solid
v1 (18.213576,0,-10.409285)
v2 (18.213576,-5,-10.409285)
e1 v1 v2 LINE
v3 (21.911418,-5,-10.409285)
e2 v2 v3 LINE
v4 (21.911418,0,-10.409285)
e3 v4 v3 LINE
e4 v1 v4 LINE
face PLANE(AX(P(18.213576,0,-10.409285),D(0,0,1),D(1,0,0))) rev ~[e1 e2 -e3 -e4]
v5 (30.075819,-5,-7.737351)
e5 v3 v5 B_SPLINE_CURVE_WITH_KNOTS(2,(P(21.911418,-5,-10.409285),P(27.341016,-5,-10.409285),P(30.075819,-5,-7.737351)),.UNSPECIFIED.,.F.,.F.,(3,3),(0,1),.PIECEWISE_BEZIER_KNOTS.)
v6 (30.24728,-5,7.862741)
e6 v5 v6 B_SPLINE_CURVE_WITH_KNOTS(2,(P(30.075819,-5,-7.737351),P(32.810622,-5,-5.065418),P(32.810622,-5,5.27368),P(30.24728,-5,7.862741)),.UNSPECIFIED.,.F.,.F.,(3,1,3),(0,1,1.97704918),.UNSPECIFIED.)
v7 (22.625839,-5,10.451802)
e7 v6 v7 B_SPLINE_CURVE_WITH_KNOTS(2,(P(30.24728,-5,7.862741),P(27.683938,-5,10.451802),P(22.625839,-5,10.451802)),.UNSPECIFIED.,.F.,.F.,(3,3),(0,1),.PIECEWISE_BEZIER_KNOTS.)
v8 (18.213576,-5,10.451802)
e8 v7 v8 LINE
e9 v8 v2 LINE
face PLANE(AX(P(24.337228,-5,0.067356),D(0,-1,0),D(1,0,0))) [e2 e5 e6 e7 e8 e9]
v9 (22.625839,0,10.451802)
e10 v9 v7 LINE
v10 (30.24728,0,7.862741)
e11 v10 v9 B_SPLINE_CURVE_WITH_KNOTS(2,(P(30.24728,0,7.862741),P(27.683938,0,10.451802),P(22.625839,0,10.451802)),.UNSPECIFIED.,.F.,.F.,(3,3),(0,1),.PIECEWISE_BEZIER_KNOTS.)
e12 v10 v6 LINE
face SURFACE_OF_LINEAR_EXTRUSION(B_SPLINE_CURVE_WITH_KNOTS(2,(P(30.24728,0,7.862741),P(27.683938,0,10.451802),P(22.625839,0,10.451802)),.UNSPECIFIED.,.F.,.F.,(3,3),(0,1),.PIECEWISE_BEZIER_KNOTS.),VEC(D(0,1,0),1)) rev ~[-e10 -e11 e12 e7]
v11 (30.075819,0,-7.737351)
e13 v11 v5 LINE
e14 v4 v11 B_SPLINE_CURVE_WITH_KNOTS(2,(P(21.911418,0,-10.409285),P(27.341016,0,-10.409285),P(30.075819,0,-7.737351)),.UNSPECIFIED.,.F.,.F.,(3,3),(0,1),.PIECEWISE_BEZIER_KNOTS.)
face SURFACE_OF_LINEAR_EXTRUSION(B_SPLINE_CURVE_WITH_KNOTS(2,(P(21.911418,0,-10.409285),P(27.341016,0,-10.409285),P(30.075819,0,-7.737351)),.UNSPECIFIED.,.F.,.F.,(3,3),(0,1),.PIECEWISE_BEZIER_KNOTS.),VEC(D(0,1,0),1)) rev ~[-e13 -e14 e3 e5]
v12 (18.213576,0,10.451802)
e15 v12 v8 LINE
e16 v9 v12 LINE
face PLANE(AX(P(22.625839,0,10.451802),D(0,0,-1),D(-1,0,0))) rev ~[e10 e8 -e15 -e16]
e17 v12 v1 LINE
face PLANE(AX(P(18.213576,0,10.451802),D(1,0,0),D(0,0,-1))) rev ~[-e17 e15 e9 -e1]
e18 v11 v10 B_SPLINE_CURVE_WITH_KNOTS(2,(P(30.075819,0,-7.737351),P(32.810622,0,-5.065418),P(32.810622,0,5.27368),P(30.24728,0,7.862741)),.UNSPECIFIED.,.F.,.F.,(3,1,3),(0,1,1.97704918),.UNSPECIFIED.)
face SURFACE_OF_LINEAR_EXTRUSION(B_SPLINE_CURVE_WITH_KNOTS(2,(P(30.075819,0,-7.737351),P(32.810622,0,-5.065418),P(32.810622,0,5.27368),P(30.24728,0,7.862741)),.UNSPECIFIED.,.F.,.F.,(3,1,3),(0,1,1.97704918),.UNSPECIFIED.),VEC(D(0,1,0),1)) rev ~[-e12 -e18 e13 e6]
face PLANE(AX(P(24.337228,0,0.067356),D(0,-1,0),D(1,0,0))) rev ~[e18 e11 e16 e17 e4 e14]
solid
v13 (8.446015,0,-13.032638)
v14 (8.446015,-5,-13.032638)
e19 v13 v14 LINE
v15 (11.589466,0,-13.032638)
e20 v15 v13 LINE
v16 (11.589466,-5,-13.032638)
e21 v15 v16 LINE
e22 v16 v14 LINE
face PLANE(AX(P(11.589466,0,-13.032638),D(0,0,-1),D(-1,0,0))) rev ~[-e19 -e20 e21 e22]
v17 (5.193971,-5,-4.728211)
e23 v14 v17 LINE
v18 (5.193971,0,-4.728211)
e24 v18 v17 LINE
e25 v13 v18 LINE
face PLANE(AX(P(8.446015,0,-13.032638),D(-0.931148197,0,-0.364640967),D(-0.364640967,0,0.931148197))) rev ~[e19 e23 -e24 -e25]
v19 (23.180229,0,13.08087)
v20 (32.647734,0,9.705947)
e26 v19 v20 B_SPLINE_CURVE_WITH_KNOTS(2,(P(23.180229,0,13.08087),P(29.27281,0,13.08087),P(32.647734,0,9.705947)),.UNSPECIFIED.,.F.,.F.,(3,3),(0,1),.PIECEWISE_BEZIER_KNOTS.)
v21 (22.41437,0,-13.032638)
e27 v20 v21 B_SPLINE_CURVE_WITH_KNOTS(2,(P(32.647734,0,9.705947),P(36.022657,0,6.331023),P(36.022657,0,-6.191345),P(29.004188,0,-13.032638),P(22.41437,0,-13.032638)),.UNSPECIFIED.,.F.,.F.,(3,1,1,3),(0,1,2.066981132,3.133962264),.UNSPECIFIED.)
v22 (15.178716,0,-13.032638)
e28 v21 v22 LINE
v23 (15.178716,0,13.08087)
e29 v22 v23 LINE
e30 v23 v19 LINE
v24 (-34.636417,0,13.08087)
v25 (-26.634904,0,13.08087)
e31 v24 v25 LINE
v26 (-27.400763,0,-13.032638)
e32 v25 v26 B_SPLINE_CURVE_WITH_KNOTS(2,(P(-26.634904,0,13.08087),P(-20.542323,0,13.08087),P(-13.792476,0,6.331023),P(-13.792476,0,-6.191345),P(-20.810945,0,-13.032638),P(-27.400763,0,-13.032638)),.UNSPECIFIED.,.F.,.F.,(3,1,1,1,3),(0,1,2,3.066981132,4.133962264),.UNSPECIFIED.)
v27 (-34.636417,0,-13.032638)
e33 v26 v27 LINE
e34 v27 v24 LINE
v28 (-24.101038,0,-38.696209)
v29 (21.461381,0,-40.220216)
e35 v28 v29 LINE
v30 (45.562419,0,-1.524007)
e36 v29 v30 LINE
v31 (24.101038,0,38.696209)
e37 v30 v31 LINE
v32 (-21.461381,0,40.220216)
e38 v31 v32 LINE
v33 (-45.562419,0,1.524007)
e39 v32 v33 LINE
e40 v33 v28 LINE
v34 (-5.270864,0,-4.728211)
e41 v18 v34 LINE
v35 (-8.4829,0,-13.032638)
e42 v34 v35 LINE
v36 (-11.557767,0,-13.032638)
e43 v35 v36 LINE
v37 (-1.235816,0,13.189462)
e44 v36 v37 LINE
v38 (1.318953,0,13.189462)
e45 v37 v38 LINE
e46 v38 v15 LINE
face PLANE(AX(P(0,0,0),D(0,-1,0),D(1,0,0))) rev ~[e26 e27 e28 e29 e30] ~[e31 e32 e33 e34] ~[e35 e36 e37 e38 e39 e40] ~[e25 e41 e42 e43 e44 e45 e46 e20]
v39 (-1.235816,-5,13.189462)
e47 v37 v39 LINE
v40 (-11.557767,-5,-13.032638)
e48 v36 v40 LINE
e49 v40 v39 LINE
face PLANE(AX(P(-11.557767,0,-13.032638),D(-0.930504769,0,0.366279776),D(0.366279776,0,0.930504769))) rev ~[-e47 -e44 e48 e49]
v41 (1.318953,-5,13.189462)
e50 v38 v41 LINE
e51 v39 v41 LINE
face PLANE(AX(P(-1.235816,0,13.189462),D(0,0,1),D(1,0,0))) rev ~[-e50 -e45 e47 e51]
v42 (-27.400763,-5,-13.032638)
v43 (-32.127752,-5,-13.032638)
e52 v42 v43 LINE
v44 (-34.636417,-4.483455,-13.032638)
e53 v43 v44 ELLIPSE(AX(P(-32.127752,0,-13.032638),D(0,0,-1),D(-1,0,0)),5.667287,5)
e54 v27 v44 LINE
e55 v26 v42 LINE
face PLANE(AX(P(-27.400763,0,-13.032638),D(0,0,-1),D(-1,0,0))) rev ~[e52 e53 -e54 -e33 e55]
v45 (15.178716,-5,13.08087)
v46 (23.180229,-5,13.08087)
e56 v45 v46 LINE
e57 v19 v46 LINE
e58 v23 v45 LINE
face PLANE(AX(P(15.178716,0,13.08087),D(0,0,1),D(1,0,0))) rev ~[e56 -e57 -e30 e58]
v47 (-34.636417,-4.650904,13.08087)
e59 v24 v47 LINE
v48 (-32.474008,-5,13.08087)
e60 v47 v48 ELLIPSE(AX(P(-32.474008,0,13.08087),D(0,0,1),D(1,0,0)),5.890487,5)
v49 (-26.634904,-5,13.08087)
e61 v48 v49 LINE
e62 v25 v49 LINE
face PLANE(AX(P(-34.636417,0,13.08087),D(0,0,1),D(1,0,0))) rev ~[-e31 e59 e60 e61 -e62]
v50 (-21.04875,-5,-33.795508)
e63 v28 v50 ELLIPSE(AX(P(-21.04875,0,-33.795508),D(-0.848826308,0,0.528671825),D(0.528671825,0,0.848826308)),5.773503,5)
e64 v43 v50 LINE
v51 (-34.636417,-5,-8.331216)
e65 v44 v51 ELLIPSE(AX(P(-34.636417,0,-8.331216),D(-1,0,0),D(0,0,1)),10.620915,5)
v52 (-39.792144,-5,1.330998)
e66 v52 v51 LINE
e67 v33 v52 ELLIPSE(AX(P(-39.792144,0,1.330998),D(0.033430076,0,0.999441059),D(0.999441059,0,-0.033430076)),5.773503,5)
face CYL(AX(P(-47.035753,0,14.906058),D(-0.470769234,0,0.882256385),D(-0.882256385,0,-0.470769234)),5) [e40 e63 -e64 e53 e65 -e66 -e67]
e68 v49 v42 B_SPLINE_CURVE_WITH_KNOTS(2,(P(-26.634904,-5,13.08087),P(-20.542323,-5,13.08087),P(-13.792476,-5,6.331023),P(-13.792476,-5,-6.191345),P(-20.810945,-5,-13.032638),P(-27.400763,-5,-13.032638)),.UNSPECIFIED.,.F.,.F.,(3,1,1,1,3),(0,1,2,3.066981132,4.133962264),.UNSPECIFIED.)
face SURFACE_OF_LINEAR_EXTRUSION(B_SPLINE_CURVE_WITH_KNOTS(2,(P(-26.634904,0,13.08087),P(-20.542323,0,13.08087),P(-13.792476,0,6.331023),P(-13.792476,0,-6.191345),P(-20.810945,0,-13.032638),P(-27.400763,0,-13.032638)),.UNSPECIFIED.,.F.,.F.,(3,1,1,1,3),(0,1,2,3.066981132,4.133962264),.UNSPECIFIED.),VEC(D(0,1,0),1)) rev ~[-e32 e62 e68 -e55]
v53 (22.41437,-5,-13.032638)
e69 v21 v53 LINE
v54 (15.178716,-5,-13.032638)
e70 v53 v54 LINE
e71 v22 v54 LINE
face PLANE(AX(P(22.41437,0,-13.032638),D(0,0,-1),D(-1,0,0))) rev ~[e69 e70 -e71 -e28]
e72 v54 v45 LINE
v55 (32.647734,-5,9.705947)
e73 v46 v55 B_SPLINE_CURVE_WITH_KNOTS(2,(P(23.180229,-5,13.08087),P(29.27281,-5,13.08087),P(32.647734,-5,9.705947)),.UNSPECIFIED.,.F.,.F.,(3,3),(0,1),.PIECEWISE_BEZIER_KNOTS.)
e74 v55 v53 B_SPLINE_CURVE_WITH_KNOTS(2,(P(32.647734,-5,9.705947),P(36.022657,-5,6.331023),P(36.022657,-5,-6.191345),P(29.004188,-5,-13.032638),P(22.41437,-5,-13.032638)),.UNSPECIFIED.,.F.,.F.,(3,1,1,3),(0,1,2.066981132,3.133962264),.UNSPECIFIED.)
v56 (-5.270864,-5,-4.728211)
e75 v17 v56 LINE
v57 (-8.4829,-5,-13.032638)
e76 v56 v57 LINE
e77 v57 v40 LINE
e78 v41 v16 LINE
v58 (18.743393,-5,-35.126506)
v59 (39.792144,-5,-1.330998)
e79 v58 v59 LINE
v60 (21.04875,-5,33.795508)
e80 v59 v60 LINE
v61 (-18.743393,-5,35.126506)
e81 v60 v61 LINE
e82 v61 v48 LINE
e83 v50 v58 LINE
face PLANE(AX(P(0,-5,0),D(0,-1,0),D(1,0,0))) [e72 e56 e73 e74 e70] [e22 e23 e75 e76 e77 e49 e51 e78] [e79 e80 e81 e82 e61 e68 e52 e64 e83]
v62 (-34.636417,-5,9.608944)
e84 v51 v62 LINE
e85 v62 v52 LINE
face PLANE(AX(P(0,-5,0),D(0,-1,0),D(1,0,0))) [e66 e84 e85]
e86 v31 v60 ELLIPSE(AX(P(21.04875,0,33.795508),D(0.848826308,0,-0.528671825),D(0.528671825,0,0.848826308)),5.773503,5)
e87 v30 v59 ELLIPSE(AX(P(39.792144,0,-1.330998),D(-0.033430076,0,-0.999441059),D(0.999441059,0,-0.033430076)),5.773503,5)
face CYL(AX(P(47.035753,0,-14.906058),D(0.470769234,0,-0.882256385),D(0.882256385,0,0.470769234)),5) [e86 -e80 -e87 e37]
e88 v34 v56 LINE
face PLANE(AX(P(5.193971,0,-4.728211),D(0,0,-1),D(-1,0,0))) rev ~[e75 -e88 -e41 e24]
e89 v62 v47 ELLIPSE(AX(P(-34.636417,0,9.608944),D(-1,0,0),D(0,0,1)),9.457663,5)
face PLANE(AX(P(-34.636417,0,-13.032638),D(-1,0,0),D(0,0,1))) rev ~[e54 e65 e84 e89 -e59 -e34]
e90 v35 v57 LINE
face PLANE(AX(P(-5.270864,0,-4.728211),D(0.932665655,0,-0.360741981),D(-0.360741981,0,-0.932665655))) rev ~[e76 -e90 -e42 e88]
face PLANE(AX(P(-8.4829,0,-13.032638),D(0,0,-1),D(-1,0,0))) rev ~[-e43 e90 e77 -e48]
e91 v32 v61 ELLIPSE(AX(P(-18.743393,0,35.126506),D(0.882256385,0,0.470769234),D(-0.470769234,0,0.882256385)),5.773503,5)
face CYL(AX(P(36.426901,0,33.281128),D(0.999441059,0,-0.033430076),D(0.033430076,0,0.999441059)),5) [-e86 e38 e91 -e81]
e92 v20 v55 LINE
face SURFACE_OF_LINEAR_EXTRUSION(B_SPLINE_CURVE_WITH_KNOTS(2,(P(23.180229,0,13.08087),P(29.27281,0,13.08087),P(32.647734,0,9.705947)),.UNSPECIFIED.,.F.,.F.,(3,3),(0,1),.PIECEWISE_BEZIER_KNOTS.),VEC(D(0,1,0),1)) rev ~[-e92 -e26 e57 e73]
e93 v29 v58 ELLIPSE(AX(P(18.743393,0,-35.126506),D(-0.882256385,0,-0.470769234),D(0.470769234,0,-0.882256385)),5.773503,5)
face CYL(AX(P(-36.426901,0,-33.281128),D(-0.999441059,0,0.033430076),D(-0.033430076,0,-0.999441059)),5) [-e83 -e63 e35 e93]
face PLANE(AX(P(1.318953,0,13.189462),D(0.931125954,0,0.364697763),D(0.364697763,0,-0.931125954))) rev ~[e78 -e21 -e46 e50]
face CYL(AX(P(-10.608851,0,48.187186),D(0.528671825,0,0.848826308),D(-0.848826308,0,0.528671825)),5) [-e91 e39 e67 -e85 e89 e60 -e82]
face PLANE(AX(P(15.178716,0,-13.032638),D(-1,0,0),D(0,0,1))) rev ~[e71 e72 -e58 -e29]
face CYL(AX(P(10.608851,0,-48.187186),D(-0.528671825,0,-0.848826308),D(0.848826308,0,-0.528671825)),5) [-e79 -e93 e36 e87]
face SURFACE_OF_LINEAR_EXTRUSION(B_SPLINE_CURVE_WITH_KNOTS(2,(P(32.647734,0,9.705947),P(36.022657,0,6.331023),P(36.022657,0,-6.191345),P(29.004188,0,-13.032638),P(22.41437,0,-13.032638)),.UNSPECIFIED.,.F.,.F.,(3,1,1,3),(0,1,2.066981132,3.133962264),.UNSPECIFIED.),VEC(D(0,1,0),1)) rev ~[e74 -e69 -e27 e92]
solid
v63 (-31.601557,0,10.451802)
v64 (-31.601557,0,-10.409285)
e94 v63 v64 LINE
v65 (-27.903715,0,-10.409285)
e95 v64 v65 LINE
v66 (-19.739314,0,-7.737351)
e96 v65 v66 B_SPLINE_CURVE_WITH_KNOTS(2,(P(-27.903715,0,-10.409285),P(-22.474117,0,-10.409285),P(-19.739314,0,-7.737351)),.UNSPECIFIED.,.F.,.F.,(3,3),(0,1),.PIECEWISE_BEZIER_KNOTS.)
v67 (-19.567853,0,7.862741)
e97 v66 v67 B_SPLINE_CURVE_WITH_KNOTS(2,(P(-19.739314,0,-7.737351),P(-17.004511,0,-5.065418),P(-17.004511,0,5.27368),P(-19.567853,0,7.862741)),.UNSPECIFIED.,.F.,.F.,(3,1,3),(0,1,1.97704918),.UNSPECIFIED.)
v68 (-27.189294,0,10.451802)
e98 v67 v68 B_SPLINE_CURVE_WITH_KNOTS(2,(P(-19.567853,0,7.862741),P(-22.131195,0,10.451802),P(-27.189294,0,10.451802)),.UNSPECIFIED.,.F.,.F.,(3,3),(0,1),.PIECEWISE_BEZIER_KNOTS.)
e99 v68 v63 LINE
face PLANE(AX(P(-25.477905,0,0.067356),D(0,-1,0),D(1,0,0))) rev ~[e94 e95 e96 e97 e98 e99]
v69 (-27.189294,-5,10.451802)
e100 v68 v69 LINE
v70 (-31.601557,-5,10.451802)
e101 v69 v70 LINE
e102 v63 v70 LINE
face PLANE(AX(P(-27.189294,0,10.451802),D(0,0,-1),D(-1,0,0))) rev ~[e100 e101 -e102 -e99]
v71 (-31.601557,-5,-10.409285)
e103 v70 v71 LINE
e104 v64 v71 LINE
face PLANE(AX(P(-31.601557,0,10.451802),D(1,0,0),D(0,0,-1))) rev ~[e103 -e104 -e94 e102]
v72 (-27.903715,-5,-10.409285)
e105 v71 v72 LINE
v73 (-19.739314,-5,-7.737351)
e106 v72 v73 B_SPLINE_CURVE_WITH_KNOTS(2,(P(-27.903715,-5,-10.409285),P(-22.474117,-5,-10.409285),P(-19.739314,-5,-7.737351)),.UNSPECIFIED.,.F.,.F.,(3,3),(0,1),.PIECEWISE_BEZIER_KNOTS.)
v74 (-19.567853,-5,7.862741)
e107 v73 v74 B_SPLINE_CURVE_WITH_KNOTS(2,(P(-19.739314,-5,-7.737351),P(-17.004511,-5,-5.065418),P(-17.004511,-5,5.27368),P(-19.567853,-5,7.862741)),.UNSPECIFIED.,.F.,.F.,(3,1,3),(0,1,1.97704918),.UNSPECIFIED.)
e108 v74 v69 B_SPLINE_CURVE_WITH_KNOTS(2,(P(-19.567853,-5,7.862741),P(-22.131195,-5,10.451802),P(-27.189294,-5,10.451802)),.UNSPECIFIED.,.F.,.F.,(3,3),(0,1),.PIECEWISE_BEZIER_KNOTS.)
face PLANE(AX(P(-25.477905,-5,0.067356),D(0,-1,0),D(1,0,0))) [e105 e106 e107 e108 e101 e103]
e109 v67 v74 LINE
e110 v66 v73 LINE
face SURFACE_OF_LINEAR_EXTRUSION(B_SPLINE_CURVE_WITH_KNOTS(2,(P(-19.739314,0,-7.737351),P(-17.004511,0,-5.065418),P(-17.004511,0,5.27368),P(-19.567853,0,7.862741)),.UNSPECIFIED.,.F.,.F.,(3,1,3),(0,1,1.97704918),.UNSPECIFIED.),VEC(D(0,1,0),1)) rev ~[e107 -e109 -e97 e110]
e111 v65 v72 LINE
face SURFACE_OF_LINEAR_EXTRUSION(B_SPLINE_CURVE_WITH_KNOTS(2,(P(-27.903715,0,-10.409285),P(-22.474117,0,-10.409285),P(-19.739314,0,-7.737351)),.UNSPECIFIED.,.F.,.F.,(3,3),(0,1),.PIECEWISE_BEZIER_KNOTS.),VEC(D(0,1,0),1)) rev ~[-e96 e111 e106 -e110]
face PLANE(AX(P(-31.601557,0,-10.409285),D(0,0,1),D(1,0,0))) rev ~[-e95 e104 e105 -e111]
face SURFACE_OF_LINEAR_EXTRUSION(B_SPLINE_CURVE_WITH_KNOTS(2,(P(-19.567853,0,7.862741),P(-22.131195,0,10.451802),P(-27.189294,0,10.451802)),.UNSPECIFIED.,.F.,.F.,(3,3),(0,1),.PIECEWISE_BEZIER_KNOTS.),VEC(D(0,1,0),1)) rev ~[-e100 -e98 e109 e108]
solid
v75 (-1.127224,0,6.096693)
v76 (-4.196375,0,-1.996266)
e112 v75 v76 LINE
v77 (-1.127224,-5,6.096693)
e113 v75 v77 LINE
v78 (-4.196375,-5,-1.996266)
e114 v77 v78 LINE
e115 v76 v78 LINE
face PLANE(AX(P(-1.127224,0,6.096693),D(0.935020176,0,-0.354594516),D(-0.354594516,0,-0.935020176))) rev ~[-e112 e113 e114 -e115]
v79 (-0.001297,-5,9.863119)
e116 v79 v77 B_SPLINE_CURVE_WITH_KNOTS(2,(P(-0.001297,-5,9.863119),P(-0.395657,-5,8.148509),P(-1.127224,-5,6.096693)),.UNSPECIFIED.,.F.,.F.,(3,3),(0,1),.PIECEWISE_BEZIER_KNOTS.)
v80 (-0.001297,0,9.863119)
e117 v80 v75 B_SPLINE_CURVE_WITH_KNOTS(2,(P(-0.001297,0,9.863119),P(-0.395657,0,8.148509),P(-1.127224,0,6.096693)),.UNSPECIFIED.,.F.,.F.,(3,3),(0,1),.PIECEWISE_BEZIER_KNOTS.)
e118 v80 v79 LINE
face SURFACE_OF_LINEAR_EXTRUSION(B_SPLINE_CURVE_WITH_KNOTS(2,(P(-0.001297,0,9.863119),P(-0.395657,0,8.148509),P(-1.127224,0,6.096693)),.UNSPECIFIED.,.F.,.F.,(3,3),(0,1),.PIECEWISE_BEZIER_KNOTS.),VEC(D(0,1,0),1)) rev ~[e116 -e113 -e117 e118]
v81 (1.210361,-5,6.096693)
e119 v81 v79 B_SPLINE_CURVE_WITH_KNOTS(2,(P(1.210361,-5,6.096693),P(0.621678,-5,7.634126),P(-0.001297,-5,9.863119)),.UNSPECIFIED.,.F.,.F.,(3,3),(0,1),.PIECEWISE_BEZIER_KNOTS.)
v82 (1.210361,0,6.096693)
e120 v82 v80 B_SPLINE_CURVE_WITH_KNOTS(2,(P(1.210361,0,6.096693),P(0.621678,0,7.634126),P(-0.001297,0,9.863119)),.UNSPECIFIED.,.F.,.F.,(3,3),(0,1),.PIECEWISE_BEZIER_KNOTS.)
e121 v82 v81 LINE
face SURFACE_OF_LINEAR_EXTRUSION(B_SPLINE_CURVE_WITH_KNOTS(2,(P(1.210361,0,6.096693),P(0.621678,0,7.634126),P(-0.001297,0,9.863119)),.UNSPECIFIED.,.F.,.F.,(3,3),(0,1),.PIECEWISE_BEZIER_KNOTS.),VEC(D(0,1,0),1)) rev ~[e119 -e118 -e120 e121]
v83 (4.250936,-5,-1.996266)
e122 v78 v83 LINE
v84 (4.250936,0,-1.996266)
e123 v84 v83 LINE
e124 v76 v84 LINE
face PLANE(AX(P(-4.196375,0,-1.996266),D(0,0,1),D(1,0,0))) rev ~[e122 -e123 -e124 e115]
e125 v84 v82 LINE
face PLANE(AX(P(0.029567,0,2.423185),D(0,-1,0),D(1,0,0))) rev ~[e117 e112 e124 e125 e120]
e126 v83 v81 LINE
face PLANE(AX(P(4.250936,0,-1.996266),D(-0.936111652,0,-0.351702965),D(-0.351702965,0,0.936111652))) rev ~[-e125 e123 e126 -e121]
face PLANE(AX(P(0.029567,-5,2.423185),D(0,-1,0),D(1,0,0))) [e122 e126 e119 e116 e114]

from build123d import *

# Parameters (mm, degrees)
F1_DEPTH     = 5
F2_T1_DEPTH  = 70.5879001638
F2_T3_DEPTH  = 70.5879001638
F2_T5_DEPTH  = 70.5879001638
F2_T7_DEPTH  = 70.5879001638
F2_T9_DEPTH  = 70.5879001638
F2_T11_DEPTH = 70.5879001638


# Not quite as in the source:
# - a fillet or chamfer that OpenCascade refuses, or shapes differently, is made with other operations: its cross-section is extruded or revolved along the edge and cut away or added


with BuildPart() as f1:
    # F0 (on Front) → F1 (new body)
    with BuildSketch(Plane.XZ):
        with BuildLine():
            Line((-4.1963754653, -1.9962660098), (4.2509359723, -1.9962660098))
            Line((4.2509359723, -1.9962660098), (1.2103610841, 6.0966927153))
            add(Edge.make_bspline(
                [(1.2103610841, 6.0966927153), (0.621678352, 7.6341262584), (-0.0012965781, 9.8631191276)],
                knots=[0, 0, 0, 1, 1, 1], degree=2))
            add(Edge.make_bspline(
                [(-0.0012965781, 9.8631191276), (-0.395656855, 8.1485092282), (-1.1272237454, 6.0966927153)],
                knots=[0, 0, 0, 1, 1, 1], degree=2))
            Line((-1.1272237454, 6.0966927153), (-4.1963754653, -1.9962660098))
        make_face()
    extrude(amount=F1_DEPTH)


with BuildPart() as f1b:
    # F0 (on Front) → F1, piece 2 (new body)
    with BuildSketch(Plane.XZ):
        with BuildLine():
            add(Edge.make_bspline(
                [(30.0758187402, -7.7373514895), (32.8106215297, -5.0654177297), (32.8106215297, 0.1641424634)],
                knots=[0, 0, 0, 1, 1, 1], degree=2))
            add(Edge.make_bspline(
                [(32.8106215297, 0.1641424634), (32.8106215297, 5.2736799636), (30.2472797301, 7.8627409117)],
                knots=[0, 0, 0, 1, 1, 1], degree=2))
            add(Edge.make_bspline(
                [(30.2472797301, 7.8627409117), (27.6839379305, 10.4518018597), (22.6258387274, 10.4518018597)],
                knots=[0, 0, 0, 1, 1, 1], degree=2))
            Line((22.6258387274, 10.4518018597), (18.2135759196, 10.4518018597))
            Line((18.2135759196, 10.4518018597), (18.2135759196, -10.4092852494))
            Line((18.2135759196, -10.4092852494), (21.911417936, -10.4092852494))
            add(Edge.make_bspline(
                [(21.911417936, -10.4092852494), (27.3410159507, -10.4092852494), (30.0758187402, -7.7373514895)],
                knots=[0, 0, 0, 1, 1, 1], degree=2))
        make_face()
    extrude(amount=F1_DEPTH)


with BuildPart() as f1c:
    # F0 (on Front) → F1, piece 3 (new body)
    with BuildSketch(Plane.XZ):
        Polygon((45.5624192078, -1.5240069806), (24.1010383647, 38.6962090015), (-21.4613808431, 40.2202159821), (-45.5624192078, 1.5240069806), (-24.1010383647, -38.6962090015), (21.4613808431, -40.2202159821), align=None)
        with BuildLine():
            add(Edge.make_bspline(
                [(-17.1673993541, 9.7059465535), (-13.7924755355, 6.3310227349), (-13.7924755355, 0.2727344237)],
                knots=[0, 0, 0, 1, 1, 1], degree=2))
            add(Edge.make_bspline(
                [(-13.7924755355, 0.2727344237), (-13.7924755355, -6.1913448969), (-17.3017104629, -9.6119916462)],
                knots=[0, 0, 0, 1, 1, 1], degree=2))
            add(Edge.make_bspline(
                [(-17.3017104629, -9.6119916462), (-20.8109453903, -13.0326383955), (-27.4007627703, -13.0326383955)],
                knots=[0, 0, 0, 1, 1, 1], degree=2))
            Line((-27.4007627703, -13.0326383955), (-34.6364165456, -13.0326383955))
            Line((-34.6364165456, -13.0326383955), (-34.6364165456, 13.0808703721))
            Line((-34.6364165456, 13.0808703721), (-26.6349036819, 13.0808703721))
            add(Edge.make_bspline(
                [(-26.6349036819, 13.0808703721), (-20.5423231727, 13.0808703721), (-17.1673993541, 9.7059465535)],
                knots=[0, 0, 0, 1, 1, 1], degree=2))
        make_face(mode=Mode.SUBTRACT)
        Polygon((11.5894663417, -13.0326383955), (8.4460148595, -13.0326383955), (5.193971417, -4.7282111161), (-5.2708643356, -4.7282111161), (-8.4829002137, -13.0326383955), (-11.5577673, -13.0326383955), (-1.2358157057, 13.1894623324), (1.3189530444, 13.1894623324), align=None, mode=Mode.SUBTRACT)
        with BuildLine():
            add(Edge.make_bspline(
                [(32.6477335892, 9.7059465535), (36.0226574079, 6.3310227349), (36.0226574079, 0.2727344237)],
                knots=[0, 0, 0, 1, 1, 1], degree=2))
            add(Edge.make_bspline(
                [(36.0226574079, 0.2727344237), (36.0226574079, -6.1913448969), (32.5134224805, -9.6119916462)],
                knots=[0, 0, 0, 1, 1, 1], degree=2))
            add(Edge.make_bspline(
                [(32.5134224805, -9.6119916462), (29.0041875531, -13.0326383955), (22.4143701731, -13.0326383955)],
                knots=[0, 0, 0, 1, 1, 1], degree=2))
            Line((22.4143701731, -13.0326383955), (15.1787163977, -13.0326383955))
            Line((15.1787163977, -13.0326383955), (15.1787163977, 13.0808703721))
            Line((15.1787163977, 13.0808703721), (23.1802292615, 13.0808703721))
            add(Edge.make_bspline(
                [(23.1802292615, 13.0808703721), (29.2728097706, 13.0808703721), (32.6477335892, 9.7059465535)],
                knots=[0, 0, 0, 1, 1, 1], degree=2))
        make_face(mode=Mode.SUBTRACT)
    extrude(amount=F1_DEPTH)

    # F2: fillet of radius 5 on 6 edges, made by hand

    # F2_s2 → F2_t1 (cut)
    with BuildSketch(Plane(origin=(18.6589169913, 0, 29.9584333551), x_dir=(0, 1, 0), z_dir=(-0.5286718247, 0, -0.8488263084))):
        with BuildLine():
            ThreePointArc((0, -39.480279647), (-3.5355339059, -38.015813553), (-5, -34.480279647))
            Line((-5, -34.480279647), (-5, -39.480279647))
            Line((-5, -39.480279647), (0, -39.480279647))
        make_face()
    extrude(amount=F2_T1_DEPTH, mode=Mode.SUBTRACT)

    # F2_s4 → F2_t3 (cut)
    with BuildSketch(Plane(origin=(35.2742228388, 0, -1.179879444), x_dir=(0, 1, 0), z_dir=(-0.9994410588, 0, 0.0334300763))):
        with BuildLine():
            ThreePointArc((0, -39.480279647), (-3.5355339059, -38.015813553), (-5, -34.480279647))
            Line((-5, -34.480279647), (-5, -39.480279647))
            Line((-5, -39.480279647), (0, -39.480279647))
        make_face()
    extrude(amount=F2_T3_DEPTH, mode=Mode.SUBTRACT)

    # F2_s6 → F2_t5 (cut)
    with BuildSketch(Plane(origin=(16.6153058475, 0, -31.1383127992), x_dir=(0, 1, 0), z_dir=(-0.4707692341, 0, 0.8822563846))):
        with BuildLine():
            ThreePointArc((0, -39.480279647), (-3.5355339059, -38.015813553), (-5, -34.480279647))
            Line((-5, -34.480279647), (-5, -39.480279647))
            Line((-5, -39.480279647), (0, -39.480279647))
        make_face()
    extrude(amount=F2_T5_DEPTH, mode=Mode.SUBTRACT)

    # F2_s8 → F2_t7 (cut)
    with BuildSketch(Plane(origin=(-18.6589169913, 0, -29.9584333551), x_dir=(0, 1, 0), z_dir=(0.5286718247, 0, 0.8488263084))):
        with BuildLine():
            ThreePointArc((0, -39.480279647), (-3.5355339059, -38.015813553), (-5, -34.480279647))
            Line((-5, -34.480279647), (-5, -39.480279647))
            Line((-5, -39.480279647), (0, -39.480279647))
        make_face()
    extrude(amount=F2_T7_DEPTH, mode=Mode.SUBTRACT)

    # F2_s10 → F2_t9 (cut)
    with BuildSketch(Plane(origin=(-16.6153058475, 0, 31.1383127992), x_dir=(0, 1, 0), z_dir=(0.4707692341, 0, -0.8822563846))):
        with BuildLine():
            ThreePointArc((0, -39.480279647), (-3.5355339059, -38.015813553), (-5, -34.480279647))
            Line((-5, -34.480279647), (-5, -39.480279647))
            Line((-5, -39.480279647), (0, -39.480279647))
        make_face()
    extrude(amount=F2_T9_DEPTH, mode=Mode.SUBTRACT)

    # F2_s12 → F2_t11 (cut)
    with BuildSketch(Plane(origin=(-35.2742228388, 0, 1.179879444), x_dir=(0, 1, 0), z_dir=(0.9994410588, 0, -0.0334300763))):
        with BuildLine():
            ThreePointArc((0, -39.480279647), (-3.5355339059, -38.015813553), (-5, -34.480279647))
            Line((-5, -34.480279647), (-5, -39.480279647))
            Line((-5, -39.480279647), (0, -39.480279647))
        make_face()
    extrude(amount=F2_T11_DEPTH, mode=Mode.SUBTRACT)


with BuildPart() as f1d:
    # F0 (on Front) → F1, piece 4 (new body)
    with BuildSketch(Plane.XZ):
        with BuildLine():
            add(Edge.make_bspline(
                [(-19.7393142032, -7.7373514895), (-17.0045114137, -5.0654177297), (-17.0045114137, 0.1641424634)],
                knots=[0, 0, 0, 1, 1, 1], degree=2))
            add(Edge.make_bspline(
                [(-17.0045114137, 0.1641424634), (-17.0045114137, 5.2736799636), (-19.5678532132, 7.8627409117)],
                knots=[0, 0, 0, 1, 1, 1], degree=2))
            add(Edge.make_bspline(
                [(-19.5678532132, 7.8627409117), (-22.1311950128, 10.4518018597), (-27.189294216, 10.4518018597)],
                knots=[0, 0, 0, 1, 1, 1], degree=2))
            Line((-27.189294216, 10.4518018597), (-31.6015570237, 10.4518018597))
            Line((-31.6015570237, 10.4518018597), (-31.6015570237, -10.4092852494))
            Line((-31.6015570237, -10.4092852494), (-27.9037150074, -10.4092852494))
            add(Edge.make_bspline(
                [(-27.9037150074, -10.4092852494), (-22.4741169927, -10.4092852494), (-19.7393142032, -7.7373514895)],
                knots=[0, 0, 0, 1, 1, 1], degree=2))
        make_face()
    extrude(amount=F1_DEPTH)


solid = Compound([f1.part, f1b.part, f1c.part, f1d.part])
